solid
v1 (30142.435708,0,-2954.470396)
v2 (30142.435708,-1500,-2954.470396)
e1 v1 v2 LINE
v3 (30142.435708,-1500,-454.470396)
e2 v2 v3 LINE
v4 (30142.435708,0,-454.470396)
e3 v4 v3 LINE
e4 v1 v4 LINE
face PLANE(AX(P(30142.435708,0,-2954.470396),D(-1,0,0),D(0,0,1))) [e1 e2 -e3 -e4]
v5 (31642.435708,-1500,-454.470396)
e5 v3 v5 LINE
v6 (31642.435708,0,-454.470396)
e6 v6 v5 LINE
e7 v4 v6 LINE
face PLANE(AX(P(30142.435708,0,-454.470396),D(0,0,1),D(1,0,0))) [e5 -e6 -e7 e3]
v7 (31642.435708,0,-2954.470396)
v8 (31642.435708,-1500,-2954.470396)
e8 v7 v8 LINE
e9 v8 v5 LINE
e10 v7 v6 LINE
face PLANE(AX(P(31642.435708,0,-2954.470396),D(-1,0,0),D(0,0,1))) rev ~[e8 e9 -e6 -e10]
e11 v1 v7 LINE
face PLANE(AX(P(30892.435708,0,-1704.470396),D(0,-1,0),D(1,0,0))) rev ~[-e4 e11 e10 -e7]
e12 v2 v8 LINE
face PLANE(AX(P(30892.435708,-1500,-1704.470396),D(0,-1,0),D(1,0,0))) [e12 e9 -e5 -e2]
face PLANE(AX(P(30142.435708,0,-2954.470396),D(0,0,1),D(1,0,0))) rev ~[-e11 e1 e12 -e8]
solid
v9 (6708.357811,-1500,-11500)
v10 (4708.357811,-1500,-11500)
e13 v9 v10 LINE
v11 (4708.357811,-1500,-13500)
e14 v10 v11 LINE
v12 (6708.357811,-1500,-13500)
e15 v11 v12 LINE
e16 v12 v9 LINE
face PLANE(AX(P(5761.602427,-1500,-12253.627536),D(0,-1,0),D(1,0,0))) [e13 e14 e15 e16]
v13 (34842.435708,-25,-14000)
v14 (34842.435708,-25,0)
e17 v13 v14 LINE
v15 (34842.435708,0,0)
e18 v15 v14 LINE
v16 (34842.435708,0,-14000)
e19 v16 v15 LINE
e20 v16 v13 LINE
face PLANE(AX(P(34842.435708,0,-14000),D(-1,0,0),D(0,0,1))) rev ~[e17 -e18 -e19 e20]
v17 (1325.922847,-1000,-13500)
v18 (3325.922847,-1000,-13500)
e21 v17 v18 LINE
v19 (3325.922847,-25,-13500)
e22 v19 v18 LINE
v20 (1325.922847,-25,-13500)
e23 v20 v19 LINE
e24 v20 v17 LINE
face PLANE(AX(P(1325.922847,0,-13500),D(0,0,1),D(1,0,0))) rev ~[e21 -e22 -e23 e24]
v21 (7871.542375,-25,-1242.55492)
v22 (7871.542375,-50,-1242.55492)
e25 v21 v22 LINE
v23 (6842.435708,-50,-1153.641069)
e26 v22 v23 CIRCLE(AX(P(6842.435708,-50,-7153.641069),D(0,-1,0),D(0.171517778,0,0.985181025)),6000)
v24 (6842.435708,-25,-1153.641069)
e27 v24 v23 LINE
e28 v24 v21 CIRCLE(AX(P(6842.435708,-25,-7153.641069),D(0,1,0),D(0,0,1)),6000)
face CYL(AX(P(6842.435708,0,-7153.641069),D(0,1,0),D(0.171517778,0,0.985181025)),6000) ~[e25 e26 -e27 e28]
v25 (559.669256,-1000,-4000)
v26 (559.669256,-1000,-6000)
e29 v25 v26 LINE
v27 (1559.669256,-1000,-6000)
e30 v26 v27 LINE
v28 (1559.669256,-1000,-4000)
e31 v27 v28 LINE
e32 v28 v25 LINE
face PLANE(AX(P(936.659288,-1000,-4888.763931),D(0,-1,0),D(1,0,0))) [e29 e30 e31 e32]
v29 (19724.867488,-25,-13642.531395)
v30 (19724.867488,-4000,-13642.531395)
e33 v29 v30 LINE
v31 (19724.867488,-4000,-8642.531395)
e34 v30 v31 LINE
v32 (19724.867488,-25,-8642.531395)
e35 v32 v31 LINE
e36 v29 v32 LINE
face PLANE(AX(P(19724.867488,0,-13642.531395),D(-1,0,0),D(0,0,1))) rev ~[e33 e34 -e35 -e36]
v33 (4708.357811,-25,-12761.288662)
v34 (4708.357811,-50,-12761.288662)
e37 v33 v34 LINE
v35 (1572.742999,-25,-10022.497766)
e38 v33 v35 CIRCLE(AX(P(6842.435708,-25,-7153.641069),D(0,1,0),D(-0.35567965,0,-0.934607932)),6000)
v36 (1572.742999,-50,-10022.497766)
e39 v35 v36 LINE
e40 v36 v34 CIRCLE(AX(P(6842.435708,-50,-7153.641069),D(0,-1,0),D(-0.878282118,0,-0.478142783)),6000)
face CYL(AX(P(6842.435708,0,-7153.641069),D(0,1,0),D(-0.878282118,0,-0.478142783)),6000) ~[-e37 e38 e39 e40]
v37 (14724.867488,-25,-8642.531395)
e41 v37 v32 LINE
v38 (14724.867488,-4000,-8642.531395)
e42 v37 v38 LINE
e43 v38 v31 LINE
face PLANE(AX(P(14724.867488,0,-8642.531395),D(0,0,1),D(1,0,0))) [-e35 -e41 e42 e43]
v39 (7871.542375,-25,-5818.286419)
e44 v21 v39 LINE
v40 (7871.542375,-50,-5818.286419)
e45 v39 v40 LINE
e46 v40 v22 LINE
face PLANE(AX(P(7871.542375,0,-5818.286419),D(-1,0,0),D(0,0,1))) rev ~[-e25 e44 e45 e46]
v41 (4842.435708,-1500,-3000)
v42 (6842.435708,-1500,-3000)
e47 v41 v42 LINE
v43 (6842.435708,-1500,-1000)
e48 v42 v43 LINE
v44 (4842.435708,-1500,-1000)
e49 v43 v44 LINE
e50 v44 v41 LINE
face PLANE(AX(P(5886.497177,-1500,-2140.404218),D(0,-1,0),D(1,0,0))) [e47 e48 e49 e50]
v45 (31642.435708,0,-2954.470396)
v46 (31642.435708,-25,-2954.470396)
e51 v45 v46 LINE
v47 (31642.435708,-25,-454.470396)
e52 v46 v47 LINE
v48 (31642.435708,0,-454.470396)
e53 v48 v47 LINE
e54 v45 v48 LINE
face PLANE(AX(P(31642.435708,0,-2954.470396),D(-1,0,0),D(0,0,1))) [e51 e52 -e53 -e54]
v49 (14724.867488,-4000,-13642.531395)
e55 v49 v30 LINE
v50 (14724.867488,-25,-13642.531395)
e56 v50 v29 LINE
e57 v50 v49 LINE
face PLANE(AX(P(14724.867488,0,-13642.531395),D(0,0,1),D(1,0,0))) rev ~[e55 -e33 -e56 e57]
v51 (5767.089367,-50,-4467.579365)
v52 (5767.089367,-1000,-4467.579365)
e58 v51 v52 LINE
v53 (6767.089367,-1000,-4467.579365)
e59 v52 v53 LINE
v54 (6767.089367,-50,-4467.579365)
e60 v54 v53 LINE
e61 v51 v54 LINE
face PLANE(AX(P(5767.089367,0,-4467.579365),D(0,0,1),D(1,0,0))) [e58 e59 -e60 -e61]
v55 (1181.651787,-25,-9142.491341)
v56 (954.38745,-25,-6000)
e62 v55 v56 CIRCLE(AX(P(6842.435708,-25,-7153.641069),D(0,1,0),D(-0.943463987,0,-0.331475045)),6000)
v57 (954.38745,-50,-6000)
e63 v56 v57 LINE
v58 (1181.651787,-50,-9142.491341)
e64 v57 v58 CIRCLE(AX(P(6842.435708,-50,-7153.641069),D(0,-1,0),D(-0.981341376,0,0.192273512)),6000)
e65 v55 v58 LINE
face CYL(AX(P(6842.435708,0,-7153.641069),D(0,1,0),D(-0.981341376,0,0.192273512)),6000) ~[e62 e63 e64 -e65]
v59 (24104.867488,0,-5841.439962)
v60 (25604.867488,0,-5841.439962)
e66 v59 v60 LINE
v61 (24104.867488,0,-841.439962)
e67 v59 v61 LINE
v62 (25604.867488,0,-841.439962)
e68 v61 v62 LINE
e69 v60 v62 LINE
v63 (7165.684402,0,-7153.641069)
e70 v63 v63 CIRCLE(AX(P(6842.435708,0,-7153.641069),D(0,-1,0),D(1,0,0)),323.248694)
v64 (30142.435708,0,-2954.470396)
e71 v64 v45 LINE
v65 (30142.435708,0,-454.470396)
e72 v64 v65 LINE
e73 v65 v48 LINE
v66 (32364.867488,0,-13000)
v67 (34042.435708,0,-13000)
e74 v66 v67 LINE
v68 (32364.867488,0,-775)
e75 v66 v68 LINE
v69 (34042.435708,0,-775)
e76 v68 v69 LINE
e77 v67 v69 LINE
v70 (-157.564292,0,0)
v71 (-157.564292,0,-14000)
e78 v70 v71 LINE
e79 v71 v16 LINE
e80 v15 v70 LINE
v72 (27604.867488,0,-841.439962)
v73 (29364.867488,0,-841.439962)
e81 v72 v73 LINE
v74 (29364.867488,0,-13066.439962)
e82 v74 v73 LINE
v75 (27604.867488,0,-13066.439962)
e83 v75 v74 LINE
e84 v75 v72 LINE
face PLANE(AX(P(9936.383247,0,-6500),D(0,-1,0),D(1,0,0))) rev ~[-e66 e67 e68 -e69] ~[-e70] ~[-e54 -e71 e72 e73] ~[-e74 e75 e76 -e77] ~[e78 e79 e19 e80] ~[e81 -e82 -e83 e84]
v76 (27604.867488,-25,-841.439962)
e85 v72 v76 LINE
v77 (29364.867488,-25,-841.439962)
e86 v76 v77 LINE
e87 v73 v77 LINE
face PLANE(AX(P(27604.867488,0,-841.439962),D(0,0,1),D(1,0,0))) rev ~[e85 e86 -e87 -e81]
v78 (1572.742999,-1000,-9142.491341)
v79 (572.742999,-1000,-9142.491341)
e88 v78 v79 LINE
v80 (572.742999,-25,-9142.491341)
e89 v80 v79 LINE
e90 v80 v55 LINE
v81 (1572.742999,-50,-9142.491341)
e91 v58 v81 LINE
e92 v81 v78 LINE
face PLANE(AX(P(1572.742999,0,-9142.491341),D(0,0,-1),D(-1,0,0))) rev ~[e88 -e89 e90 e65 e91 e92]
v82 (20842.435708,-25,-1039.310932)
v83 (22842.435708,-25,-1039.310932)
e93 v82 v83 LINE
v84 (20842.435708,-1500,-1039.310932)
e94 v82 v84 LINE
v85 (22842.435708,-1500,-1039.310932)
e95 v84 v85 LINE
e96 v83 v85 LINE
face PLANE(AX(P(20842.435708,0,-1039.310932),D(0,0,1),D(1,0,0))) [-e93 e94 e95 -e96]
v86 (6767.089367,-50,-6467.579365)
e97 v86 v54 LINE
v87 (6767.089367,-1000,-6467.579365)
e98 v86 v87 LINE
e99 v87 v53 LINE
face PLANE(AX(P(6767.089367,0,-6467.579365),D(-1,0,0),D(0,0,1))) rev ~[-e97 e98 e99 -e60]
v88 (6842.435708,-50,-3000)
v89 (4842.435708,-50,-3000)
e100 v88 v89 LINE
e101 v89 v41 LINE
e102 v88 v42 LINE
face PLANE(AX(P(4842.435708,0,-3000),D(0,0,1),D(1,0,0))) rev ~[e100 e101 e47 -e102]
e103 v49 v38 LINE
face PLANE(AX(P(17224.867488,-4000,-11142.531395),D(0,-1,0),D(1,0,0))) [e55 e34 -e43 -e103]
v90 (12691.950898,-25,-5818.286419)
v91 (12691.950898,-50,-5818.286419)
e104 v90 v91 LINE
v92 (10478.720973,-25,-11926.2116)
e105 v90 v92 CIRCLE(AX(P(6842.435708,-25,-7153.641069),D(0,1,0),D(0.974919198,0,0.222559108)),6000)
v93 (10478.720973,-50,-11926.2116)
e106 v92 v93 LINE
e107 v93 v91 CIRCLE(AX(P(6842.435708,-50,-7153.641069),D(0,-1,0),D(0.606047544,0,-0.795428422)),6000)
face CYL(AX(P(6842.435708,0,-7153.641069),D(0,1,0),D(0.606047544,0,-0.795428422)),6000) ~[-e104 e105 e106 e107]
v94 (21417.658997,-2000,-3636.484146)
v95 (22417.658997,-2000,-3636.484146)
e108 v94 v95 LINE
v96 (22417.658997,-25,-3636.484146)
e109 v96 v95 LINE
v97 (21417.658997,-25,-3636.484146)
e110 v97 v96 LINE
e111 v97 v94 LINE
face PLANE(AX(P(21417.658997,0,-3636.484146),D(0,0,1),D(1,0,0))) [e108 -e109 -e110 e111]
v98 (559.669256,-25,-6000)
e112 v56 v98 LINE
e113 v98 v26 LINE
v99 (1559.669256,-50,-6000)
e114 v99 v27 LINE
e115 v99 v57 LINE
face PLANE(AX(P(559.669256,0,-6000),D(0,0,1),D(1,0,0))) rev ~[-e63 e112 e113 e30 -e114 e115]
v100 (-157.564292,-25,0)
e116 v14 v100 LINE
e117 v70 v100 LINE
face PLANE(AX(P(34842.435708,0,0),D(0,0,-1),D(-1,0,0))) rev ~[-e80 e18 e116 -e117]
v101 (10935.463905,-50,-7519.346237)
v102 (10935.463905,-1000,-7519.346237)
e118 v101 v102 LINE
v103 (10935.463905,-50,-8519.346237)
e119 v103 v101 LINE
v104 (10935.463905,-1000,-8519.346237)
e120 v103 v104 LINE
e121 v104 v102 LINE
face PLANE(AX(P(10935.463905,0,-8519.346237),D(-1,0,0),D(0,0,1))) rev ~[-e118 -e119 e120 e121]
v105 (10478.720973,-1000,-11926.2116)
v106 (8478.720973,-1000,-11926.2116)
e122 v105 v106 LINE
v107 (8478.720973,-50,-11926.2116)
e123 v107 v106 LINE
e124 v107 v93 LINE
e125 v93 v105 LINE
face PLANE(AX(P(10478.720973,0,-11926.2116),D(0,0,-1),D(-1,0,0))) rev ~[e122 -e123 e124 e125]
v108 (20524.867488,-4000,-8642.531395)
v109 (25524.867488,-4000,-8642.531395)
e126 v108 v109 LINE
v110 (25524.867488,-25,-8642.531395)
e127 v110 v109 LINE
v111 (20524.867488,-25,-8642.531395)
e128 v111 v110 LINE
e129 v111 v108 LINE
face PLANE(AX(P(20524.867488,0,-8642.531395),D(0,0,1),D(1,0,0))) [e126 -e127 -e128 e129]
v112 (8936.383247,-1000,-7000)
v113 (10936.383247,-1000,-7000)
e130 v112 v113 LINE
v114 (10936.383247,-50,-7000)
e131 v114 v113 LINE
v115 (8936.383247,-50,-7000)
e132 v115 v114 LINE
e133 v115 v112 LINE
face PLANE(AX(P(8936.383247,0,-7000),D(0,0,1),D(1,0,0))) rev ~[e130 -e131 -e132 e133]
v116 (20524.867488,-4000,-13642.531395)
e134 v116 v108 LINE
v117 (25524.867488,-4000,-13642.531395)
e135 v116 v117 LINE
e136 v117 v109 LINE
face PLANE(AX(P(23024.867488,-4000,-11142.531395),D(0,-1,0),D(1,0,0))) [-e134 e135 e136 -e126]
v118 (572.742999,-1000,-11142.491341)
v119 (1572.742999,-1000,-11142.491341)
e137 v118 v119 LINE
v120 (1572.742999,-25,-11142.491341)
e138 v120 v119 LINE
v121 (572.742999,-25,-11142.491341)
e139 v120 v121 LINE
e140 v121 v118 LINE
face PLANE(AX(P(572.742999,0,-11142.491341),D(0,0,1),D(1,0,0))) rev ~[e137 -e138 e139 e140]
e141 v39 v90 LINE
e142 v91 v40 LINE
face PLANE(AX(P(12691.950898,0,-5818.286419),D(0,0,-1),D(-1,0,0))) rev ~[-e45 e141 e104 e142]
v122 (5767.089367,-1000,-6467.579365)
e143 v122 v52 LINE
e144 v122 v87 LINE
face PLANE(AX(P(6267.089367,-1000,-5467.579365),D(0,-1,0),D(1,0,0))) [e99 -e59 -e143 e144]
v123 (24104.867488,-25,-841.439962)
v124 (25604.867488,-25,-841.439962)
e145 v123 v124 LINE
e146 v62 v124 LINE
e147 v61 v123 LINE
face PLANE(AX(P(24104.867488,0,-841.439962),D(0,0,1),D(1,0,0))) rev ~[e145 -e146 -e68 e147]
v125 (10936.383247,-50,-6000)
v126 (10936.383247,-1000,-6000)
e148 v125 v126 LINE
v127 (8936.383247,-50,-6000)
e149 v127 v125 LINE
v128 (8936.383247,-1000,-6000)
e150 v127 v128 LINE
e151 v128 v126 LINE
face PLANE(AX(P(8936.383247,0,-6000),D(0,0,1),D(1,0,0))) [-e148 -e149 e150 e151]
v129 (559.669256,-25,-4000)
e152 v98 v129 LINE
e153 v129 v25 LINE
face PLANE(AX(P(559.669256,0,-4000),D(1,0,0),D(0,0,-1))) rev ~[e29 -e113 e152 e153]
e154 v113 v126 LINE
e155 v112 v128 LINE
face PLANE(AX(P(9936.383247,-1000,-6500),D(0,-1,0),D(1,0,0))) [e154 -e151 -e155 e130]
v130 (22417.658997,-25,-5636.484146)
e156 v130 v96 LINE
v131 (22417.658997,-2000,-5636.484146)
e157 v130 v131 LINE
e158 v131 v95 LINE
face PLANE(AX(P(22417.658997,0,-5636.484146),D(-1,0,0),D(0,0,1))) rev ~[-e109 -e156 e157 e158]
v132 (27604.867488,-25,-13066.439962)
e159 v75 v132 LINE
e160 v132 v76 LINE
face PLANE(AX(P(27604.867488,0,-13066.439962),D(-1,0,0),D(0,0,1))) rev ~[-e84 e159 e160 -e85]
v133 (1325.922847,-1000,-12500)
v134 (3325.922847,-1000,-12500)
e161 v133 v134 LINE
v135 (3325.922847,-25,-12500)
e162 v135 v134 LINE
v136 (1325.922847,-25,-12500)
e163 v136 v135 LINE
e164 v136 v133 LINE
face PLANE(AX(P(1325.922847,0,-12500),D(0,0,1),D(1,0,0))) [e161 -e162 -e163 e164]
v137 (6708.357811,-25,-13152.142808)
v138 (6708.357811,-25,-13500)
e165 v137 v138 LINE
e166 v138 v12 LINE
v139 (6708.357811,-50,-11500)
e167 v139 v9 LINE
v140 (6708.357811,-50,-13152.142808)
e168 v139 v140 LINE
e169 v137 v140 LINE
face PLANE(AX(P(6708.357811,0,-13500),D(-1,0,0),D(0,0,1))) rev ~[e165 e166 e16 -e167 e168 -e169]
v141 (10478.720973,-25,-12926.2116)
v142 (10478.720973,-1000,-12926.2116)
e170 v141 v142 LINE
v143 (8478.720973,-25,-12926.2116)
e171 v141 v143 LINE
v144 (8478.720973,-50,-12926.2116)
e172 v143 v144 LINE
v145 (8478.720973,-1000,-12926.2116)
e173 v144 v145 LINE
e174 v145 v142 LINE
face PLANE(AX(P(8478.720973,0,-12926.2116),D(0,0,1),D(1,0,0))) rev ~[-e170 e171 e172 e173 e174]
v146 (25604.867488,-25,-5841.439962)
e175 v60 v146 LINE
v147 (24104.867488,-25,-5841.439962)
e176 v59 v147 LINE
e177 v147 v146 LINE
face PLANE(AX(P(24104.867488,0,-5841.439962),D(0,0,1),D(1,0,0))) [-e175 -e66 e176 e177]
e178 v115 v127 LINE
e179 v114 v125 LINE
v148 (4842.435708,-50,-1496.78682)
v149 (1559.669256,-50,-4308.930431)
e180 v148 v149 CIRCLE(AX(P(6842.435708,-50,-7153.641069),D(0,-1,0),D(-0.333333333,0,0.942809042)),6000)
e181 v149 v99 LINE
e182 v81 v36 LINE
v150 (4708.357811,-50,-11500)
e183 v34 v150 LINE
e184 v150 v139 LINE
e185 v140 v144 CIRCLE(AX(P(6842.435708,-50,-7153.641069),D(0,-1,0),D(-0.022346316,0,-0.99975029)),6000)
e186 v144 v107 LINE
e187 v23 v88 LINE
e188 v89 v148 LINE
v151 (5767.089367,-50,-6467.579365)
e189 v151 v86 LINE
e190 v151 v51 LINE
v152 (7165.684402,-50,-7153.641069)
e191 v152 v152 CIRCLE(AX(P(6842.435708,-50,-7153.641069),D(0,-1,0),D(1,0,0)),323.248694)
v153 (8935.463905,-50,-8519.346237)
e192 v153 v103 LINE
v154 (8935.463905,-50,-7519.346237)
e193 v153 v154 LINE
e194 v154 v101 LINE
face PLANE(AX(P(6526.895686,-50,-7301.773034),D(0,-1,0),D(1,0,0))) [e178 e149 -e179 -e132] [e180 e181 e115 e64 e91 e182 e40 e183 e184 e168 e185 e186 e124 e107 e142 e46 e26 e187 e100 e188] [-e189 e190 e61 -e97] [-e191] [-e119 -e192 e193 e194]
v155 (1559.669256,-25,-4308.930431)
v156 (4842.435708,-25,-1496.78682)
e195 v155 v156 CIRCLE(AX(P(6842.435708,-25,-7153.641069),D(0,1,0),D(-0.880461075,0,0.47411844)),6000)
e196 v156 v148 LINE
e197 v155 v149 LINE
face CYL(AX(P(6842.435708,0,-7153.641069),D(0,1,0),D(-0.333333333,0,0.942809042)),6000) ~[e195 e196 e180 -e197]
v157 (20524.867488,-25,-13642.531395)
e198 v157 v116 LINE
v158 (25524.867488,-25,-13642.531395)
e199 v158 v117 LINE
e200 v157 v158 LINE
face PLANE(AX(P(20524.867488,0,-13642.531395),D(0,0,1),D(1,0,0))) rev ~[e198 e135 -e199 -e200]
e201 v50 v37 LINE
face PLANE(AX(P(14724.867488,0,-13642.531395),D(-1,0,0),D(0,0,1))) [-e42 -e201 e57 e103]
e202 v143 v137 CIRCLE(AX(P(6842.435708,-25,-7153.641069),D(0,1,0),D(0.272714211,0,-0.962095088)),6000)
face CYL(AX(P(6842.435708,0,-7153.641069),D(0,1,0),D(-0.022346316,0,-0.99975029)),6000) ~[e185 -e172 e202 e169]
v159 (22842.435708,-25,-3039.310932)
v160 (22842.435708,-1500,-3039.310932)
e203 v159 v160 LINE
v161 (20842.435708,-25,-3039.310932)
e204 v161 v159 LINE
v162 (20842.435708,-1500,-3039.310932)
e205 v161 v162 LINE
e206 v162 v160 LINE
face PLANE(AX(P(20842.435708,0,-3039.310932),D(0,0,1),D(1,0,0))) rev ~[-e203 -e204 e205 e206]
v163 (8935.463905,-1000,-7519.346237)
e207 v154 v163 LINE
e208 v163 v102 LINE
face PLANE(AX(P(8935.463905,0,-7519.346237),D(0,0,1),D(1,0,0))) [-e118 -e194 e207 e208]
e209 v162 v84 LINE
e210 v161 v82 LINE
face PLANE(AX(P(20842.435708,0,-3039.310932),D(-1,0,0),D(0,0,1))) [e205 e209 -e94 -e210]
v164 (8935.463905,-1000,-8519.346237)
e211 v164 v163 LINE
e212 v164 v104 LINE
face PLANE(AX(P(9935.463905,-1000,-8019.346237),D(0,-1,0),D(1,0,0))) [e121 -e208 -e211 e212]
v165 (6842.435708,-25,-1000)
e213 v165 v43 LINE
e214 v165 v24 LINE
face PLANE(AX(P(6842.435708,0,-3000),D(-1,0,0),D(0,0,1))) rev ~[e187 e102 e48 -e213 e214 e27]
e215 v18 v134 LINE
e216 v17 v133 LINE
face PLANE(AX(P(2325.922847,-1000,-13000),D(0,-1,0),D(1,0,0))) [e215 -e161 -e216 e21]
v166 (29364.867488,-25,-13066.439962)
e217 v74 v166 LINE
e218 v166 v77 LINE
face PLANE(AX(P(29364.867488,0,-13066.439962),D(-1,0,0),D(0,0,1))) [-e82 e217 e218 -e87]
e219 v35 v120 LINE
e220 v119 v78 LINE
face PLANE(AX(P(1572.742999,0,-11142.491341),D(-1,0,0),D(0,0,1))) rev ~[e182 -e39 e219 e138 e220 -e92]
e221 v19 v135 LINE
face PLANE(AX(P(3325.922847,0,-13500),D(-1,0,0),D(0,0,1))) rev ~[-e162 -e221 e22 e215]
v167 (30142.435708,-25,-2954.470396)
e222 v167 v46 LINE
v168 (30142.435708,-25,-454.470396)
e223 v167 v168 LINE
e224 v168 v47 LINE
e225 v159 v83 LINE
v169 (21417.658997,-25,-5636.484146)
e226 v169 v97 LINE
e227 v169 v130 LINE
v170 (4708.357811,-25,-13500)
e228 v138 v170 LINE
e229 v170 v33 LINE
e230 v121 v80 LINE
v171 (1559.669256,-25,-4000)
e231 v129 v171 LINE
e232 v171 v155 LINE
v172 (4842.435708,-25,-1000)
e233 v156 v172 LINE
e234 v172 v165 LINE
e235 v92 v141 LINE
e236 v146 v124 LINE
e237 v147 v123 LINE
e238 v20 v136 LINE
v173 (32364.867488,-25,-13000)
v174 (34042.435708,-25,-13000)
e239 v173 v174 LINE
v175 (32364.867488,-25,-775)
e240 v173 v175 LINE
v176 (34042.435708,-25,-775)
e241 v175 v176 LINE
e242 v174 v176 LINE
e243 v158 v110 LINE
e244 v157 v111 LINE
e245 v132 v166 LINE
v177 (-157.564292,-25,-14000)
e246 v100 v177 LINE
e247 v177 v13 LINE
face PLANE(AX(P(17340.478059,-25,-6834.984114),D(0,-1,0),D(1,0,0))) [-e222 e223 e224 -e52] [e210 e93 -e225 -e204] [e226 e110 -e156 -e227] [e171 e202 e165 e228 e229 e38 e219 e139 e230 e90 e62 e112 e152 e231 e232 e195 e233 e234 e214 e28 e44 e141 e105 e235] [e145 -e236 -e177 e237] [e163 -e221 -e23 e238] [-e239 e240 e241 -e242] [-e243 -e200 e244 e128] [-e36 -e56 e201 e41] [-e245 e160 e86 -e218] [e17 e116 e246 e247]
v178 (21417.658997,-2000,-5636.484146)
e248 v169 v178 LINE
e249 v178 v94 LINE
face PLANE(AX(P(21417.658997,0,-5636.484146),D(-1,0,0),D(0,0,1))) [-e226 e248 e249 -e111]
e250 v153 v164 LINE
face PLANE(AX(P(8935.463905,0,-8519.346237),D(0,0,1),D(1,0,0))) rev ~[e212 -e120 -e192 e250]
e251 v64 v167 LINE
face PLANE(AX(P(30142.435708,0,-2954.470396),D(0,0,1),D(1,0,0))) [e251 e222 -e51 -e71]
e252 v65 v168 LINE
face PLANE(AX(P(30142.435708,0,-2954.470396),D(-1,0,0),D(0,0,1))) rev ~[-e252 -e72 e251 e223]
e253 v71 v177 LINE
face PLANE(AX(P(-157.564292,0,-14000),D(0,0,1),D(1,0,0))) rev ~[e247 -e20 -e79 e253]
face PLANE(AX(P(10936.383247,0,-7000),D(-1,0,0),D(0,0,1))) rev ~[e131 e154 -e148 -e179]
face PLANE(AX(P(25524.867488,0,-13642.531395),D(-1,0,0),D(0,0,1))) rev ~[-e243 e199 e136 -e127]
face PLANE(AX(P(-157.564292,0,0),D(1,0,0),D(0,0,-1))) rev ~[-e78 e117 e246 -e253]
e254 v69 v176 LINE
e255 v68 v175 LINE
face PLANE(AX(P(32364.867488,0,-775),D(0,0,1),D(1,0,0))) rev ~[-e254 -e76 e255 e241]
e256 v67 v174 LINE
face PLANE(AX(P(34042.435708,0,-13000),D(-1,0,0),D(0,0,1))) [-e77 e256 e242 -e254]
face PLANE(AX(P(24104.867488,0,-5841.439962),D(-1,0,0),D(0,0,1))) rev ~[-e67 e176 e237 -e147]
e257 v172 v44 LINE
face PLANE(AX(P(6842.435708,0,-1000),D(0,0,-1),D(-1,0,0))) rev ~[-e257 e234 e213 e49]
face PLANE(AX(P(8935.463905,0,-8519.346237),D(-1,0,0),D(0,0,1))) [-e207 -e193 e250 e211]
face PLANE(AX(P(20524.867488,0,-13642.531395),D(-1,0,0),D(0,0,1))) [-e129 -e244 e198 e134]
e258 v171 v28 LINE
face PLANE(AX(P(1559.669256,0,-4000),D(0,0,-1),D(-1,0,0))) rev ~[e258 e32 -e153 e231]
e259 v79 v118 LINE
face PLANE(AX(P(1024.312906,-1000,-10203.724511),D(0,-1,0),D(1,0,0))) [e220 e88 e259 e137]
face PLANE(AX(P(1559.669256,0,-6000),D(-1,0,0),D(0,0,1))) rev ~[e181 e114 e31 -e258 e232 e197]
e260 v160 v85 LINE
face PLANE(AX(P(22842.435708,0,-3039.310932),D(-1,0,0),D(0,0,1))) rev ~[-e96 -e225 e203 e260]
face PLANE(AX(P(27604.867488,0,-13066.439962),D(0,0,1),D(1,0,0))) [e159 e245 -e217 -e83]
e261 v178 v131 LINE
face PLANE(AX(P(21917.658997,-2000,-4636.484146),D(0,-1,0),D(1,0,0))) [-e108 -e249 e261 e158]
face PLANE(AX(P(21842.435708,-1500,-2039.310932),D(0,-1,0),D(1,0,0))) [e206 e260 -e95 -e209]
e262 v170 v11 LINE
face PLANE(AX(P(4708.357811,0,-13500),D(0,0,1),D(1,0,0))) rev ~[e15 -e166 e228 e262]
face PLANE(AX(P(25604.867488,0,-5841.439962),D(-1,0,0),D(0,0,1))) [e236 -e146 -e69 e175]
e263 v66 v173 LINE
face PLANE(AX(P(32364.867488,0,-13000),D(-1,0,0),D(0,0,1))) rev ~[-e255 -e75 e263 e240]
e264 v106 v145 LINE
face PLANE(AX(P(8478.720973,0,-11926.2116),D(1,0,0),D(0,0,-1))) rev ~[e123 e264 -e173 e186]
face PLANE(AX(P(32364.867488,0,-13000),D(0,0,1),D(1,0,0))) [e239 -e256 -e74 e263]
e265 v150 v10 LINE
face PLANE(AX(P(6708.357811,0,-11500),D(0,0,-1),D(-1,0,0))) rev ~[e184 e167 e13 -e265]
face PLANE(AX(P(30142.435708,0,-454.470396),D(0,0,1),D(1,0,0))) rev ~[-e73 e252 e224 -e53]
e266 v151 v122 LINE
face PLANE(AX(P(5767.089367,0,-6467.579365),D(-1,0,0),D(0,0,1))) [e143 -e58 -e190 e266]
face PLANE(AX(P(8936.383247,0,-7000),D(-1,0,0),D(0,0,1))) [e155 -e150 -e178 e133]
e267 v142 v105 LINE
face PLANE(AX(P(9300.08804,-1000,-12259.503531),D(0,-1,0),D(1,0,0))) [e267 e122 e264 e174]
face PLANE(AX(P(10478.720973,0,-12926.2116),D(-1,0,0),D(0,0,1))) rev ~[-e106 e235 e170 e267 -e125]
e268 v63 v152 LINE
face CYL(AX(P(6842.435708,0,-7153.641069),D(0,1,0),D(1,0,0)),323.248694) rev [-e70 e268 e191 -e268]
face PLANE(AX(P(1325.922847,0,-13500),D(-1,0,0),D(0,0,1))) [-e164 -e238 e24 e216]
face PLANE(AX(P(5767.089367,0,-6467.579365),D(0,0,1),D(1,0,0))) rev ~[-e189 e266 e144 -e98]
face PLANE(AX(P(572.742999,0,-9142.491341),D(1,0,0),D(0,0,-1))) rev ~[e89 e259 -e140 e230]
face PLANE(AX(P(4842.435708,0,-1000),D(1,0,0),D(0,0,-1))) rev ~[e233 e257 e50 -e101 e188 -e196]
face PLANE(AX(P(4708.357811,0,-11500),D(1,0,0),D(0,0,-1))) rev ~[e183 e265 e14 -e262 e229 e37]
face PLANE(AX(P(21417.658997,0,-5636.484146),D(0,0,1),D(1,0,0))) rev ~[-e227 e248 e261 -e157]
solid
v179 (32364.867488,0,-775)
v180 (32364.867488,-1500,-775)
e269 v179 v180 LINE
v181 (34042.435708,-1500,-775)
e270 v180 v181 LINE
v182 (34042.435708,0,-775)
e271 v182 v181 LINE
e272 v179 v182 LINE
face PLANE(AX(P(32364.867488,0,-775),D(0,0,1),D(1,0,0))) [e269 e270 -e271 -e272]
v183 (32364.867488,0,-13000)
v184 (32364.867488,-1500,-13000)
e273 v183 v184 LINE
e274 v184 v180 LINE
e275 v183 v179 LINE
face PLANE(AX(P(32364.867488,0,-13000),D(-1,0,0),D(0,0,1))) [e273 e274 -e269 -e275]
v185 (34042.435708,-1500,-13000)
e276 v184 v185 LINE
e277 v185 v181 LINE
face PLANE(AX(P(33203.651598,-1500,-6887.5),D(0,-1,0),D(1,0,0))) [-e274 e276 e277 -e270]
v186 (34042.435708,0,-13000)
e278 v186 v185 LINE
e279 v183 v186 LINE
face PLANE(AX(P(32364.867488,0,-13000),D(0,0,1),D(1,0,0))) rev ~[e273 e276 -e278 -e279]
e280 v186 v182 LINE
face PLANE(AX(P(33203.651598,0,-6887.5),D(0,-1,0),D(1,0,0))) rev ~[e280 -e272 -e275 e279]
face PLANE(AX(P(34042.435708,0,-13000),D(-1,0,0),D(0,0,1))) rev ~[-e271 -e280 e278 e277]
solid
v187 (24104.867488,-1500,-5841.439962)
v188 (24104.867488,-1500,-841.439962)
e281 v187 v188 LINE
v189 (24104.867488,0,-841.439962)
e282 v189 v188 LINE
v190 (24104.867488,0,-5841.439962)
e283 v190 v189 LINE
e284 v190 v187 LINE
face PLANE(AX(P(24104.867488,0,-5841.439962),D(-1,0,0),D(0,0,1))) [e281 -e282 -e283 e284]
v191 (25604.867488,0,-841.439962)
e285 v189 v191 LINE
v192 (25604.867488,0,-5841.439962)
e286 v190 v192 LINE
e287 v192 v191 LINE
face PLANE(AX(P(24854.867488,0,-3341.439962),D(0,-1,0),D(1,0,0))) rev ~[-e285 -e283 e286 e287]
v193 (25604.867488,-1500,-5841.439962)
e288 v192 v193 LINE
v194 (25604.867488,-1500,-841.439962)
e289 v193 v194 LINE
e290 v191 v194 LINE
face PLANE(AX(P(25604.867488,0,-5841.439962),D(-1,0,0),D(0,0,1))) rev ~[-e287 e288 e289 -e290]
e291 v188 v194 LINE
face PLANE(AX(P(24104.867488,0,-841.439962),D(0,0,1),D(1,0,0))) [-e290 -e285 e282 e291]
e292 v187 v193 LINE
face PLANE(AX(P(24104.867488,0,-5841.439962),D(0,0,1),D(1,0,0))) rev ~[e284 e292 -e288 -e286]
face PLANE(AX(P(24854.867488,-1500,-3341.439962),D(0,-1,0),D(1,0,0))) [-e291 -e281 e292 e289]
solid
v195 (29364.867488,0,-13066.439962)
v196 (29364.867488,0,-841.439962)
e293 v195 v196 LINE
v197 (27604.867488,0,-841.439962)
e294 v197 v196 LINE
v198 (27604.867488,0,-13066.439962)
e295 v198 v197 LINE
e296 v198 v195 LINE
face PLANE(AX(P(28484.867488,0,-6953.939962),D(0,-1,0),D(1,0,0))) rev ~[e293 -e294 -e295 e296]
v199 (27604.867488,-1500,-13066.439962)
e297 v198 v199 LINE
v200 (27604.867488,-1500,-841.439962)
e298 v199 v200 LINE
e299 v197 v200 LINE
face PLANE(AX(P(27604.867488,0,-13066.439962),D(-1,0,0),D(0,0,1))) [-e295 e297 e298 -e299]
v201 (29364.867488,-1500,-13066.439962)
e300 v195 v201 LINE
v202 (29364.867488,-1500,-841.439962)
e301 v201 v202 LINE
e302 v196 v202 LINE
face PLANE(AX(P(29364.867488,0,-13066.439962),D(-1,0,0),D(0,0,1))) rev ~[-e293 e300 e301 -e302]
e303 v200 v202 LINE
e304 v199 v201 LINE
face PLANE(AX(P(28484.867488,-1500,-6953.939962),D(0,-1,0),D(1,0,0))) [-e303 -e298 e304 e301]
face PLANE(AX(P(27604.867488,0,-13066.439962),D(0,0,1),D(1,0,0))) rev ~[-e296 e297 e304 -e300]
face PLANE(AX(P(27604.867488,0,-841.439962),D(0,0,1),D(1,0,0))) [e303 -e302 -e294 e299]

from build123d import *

# Parameters (mm, degrees)
F0_W     = 1677.5682196007
F0_H     = 12225
F1_DEPTH = 1500
F0_W_2   = 1760
F0_W_3   = 1500
F0_H_2   = 5000
F0_H_3   = 2500
F0_W_4   = 2000
F0_H_4   = 1000
F0_W_5   = 5000
F0_W_6   = 1000
F0_H_5   = 2000
F0_W_7   = 4531.0974121094
F0_H_6   = 6739.2702102661
F2_DEPTH = 25
F3_DEPTH = 4000
F4_DEPTH = 1500
F0_R     = 323.2486939486
F5_DEPTH = 50
F6_DEPTH = 2000
F7_DEPTH = 25
F8_DEPTH = 1000


# Not quite as in the source:
# - a feature names something its author has since deleted; it is built from what else it names


with BuildPart() as f1:
    # F0 (on Front) → F1 (new body)
    with BuildSketch(Plane.XZ):
        with Locations((33203.6515982442, -6887.5)):
            Rectangle(F0_W, F0_H)
    extrude(amount=F1_DEPTH)


with BuildPart() as f1b:
    # F0 (on Front) → F1, piece 2 (new body)
    with BuildSketch(Plane.XZ):
        with Locations((28484.8674884439, -6953.9399623871)):
            Rectangle(F0_W_2, F0_H)
    extrude(amount=F1_DEPTH)


with BuildPart() as f1c:
    # F0 (on Front) → F1, piece 3 (new body)
    with BuildSketch(Plane.XZ):
        with Locations((24854.8674884439, -3341.4399623871)):
            Rectangle(F0_W_3, F0_H_2)
    extrude(amount=F1_DEPTH)


with BuildPart() as f1d:
    # F0 (on Front) → F1, piece 4 (new body)
    with BuildSketch(Plane.XZ):
        with Locations((30892.4357080446, -1704.4703960419)):
            Rectangle(F0_W_3, F0_H_3)
    extrude(amount=F1_DEPTH)


with BuildPart() as f2:
    # F0 (on Front) → F2 (new body)
    with BuildSketch(Plane.XZ):
        Polygon((15060.6956481934, 0), (-157.5642919554, 0), (-157.5642919554, -14000), (34842.4357080446, -14000), (34842.4357080446, 0), (19591.7930603027, 0), (19591.7930603027, -6739.2702102661), (15060.6956481934, -6739.2702102661), align=None)
        with Locations((2325.9228467941, -13000)):
            Rectangle(F0_W_4, F0_H_4, mode=Mode.SUBTRACT)
        with Locations((17224.8674884439, -11142.5313949585)):
            Rectangle(F0_W_5, F0_H_2, mode=Mode.SUBTRACT)
        with BuildLine():
            Line((10478.7209733374, -12926.2115996243), (8478.7209733374, -12926.2115996243))
            ThreePointArc((8478.7209733374, -12926.2115996243), (7601.9868729202, -13105.3703999085), (6708.3578109742, -13152.142808433))
            Line((6708.3578109741, -13152.142808433), (6708.3578109741, -13500))
            Line((6708.3578109741, -13500), (4708.3578109741, -13500))
            Line((4708.3578109741, -13500), (4708.3578109741, -12761.2886622132))
            ThreePointArc((4708.3578109742, -12761.2886622131), (2895.3863427984, -11672.5791421162), (1572.7429986001, -10022.497766057))
            Line((1572.7429986, -10022.4977660571), (1572.7429986, -11142.4913406372))
            Line((1572.7429986, -11142.4913406372), (572.7429986, -11142.4913406372))
            Line((572.7429986, -11142.4913406372), (572.7429986, -9142.4913406372))
            Line((572.7429986, -9142.4913406372), (1181.6517873175, -9142.4913406372))
            ThreePointArc((1181.6517873175, -9142.4913406372), (858.0648867062, -7586.4295539984), (954.3874504445, -5999.9999999999))
            Line((954.3874504445, -6000), (559.6692562103, -6000))
            Line((559.6692562103, -6000), (559.6692562103, -4000))
            Line((559.6692562103, -4000), (1559.6692562103, -4000))
            Line((1559.6692562103, -4000), (1559.6692562103, -4308.9304307886))
            ThreePointArc((1559.6692562102, -4308.9304307885), (2939.0128869101, -2596.9657152915), (4842.4357080447, -1496.7868195462))
            Line((4842.4357080446, -1496.7868195462), (4842.4357080446, -1000))
            Line((4842.4357080446, -1000), (6842.4357080446, -1000))
            Line((6842.4357080446, -1000), (6842.4357080446, -1153.6410690386))
            ThreePointArc((6842.4357080447, -1153.6410690386), (7358.9059893254, -1175.9108602927), (7871.5423754885, -1242.5549195207))
            Line((7871.5423754883, -1242.5549195207), (7871.5423754883, -546.0254189148))
            Line((7871.5423754883, -546.0254189148), (13195.7473754883, -546.0254189148))
            Line((13195.7473754883, -546.0254189148), (13195.7473754883, -5818.2864189148))
            Line((13195.7473754883, -5818.2864189148), (12691.9508980747, -5818.2864189148))
            ThreePointArc((12691.9508980747, -5818.2864189149), (12804.695813918, -6481.7374822721), (12842.4357080446, -7153.6410690386))
            ThreePointArc((12842.4357080446, -7153.6410690386), (12219.1313285794, -9816.5613089485), (10478.7209733374, -11926.2115996243))
            Line((10478.7209733374, -11926.2115996243), (10478.7209733374, -12926.2115996243))
        make_face(mode=Mode.SUBTRACT)
        with Locations((23024.8674884439, -11142.5313949585)):
            Rectangle(F0_W_5, F0_H_2, mode=Mode.SUBTRACT)
        with Locations((21917.658996582, -4636.4841461182)):
            Rectangle(F0_W_6, F0_H_5, mode=Mode.SUBTRACT)
        with Locations((28484.8674884439, -6953.9399623871)):
            Rectangle(F0_W_2, F0_H, mode=Mode.SUBTRACT)
        with Locations((33203.6515982442, -6887.5)):
            Rectangle(F0_W, F0_H, mode=Mode.SUBTRACT)
        with Locations((24854.8674884439, -3341.4399623871)):
            Rectangle(F0_W_3, F0_H_2, mode=Mode.SUBTRACT)
        with Locations((21842.4357080446, -2039.3109321594)):
            Rectangle(F0_W_4, F0_H_5, mode=Mode.SUBTRACT)
        with Locations((30892.4357080446, -1704.4703960419)):
            Rectangle(F0_W_3, F0_H_3, mode=Mode.SUBTRACT)
        with Locations((17326.244354248, -3369.6351051331)):
            Rectangle(F0_W_7, F0_H_6)
        with BuildLine():
            Line((7871.5423754883, -5818.2864189148), (12691.9508980747, -5818.2864189148))
            ThreePointArc((12691.9508980747, -5818.2864189149), (10973.1970607696, -2801.9964779865), (7871.5423754885, -1242.5549195207))
            Line((7871.5423754883, -1242.5549195207), (7871.5423754883, -5818.2864189148))
        make_face()
        with BuildLine():
            ThreePointArc((7871.5423754885, -1242.5549195207), (10973.1970607696, -2801.9964779865), (12691.9508980747, -5818.2864189149))
            Line((12691.9508980747, -5818.2864189148), (13195.7473754883, -5818.2864189148))
            Line((13195.7473754883, -5818.2864189148), (13195.7473754883, -546.0254189148))
            Line((13195.7473754883, -546.0254189148), (7871.5423754883, -546.0254189148))
            Line((7871.5423754883, -546.0254189148), (7871.5423754883, -1242.5549195207))
        make_face()
    extrude(amount=F2_DEPTH)

    # F0 (on Front) → F3 (join)
    with BuildSketch(Plane.XZ):
        with Locations((17224.8674884439, -11142.5313949585)):
            Rectangle(F0_W_5, F0_H_2)
        with Locations((23024.8674884439, -11142.5313949585)):
            Rectangle(F0_W_5, F0_H_2)
    extrude(amount=F3_DEPTH)

    # F0 (on Front) → F4 (join)
    with BuildSketch(Plane.XZ):
        with BuildLine():
            Line((6842.4357080446, -3000), (6842.4357080446, -1153.6410690386))
            ThreePointArc((6842.4357080447, -1153.6410690386), (5827.8238356901, -1240.0497111177), (4842.4357080447, -1496.7868195462))
            Line((4842.4357080446, -1496.7868195462), (4842.4357080446, -3000))
            Line((4842.4357080446, -3000), (6842.4357080446, -3000))
        make_face()
        with BuildLine():
            ThreePointArc((4842.4357080447, -1496.7868195462), (5827.8238356901, -1240.0497111177), (6842.4357080447, -1153.6410690386))
            Line((6842.4357080446, -1153.6410690386), (6842.4357080446, -1000))
            Line((6842.4357080446, -1000), (4842.4357080446, -1000))
            Line((4842.4357080446, -1000), (4842.4357080446, -1496.7868195462))
        make_face()
        with BuildLine():
            ThreePointArc((4708.3578109742, -12761.2886622131), (5691.6427564117, -13042.2466410287), (6708.3578109742, -13152.142808433))
            Line((6708.3578109741, -13152.142808433), (6708.3578109741, -11500))
            Line((6708.3578109741, -11500), (4708.3578109741, -11500))
            Line((4708.3578109741, -11500), (4708.3578109741, -12761.2886622132))
        make_face()
        with BuildLine():
            Line((6708.3578109741, -13500), (6708.3578109741, -13152.142808433))
            ThreePointArc((6708.3578109742, -13152.142808433), (5691.6427564117, -13042.2466410287), (4708.3578109742, -12761.2886622131))
            Line((4708.3578109741, -12761.2886622132), (4708.3578109741, -13500))
            Line((4708.3578109741, -13500), (6708.3578109741, -13500))
        make_face()
        with Locations((21842.4357080446, -2039.3109321594)):
            Rectangle(F0_W_4, F0_H_5)
    extrude(amount=F4_DEPTH)

    # F0 (on Front) → F5 (join)
    with BuildSketch(Plane.XZ):
        with BuildLine():
            ThreePointArc((6708.3578109742, -13152.142808433), (7601.9868729202, -13105.3703999085), (8478.7209733374, -12926.2115996243))
            Line((8478.7209733374, -12926.2115996243), (8478.7209733374, -11926.2115996243))
            Line((8478.7209733374, -11926.2115996243), (10478.7209733374, -11926.2115996243))
            ThreePointArc((10478.7209733374, -11926.2115996243), (12219.1313285794, -9816.5613089485), (12842.4357080446, -7153.6410690386))
            ThreePointArc((12842.4357080446, -7153.6410690386), (12804.695813918, -6481.7374822721), (12691.9508980747, -5818.2864189149))
            Line((12691.9508980747, -5818.2864189148), (7871.5423754883, -5818.2864189148))
            Line((7871.5423754883, -5818.2864189148), (7871.5423754883, -1242.5549195207))
            ThreePointArc((7871.5423754885, -1242.5549195207), (7358.9059893254, -1175.9108602927), (6842.4357080447, -1153.6410690386))
            Line((6842.4357080446, -1153.6410690386), (6842.4357080446, -3000))
            Line((6842.4357080446, -3000), (4842.4357080446, -3000))
            Line((4842.4357080446, -3000), (4842.4357080446, -1496.7868195462))
            ThreePointArc((4842.4357080447, -1496.7868195462), (2939.0128869101, -2596.9657152915), (1559.6692562102, -4308.9304307885))
            Line((1559.6692562103, -4308.9304307886), (1559.6692562103, -6000))
            Line((1559.6692562103, -6000), (954.3874504445, -6000))
            ThreePointArc((954.3874504445, -5999.9999999999), (858.0648867062, -7586.4295539984), (1181.6517873175, -9142.4913406372))
            Line((1181.6517873175, -9142.4913406372), (1572.7429986, -9142.4913406372))
            Line((1572.7429986, -9142.4913406372), (1572.7429986, -10022.4977660571))
            ThreePointArc((1572.7429986001, -10022.497766057), (2895.3863427984, -11672.5791421162), (4708.3578109742, -12761.2886622131))
            Line((4708.3578109741, -12761.2886622132), (4708.3578109741, -11500))
            Line((4708.3578109741, -11500), (6708.3578109741, -11500))
            Line((6708.3578109741, -11500), (6708.3578109741, -13152.142808433))
        make_face()
        with Locations((6842.4357080446, -7153.6410690386)):
            Circle(F0_R, mode=Mode.SUBTRACT)
        with Locations((9935.4639053345, -8019.3462371826)):
            Rectangle(F0_W_4, F0_H_4, mode=Mode.SUBTRACT)
        with Locations((6267.0893669128, -5467.5793647766)):
            Rectangle(F0_W_6, F0_H_5, mode=Mode.SUBTRACT)
        with Locations((9936.3832473755, -6500)):
            Rectangle(F0_W_4, F0_H_4, mode=Mode.SUBTRACT)
    extrude(amount=F5_DEPTH)

    # F0 (on Front) → F6 (join)
    with BuildSketch(Plane.XZ):
        with Locations((21917.658996582, -4636.4841461182)):
            Rectangle(F0_W_6, F0_H_5)
    extrude(amount=F6_DEPTH)

    # F0 (on Front) → F7 (join)
    with BuildSketch(Plane.XZ):
        with Locations((9936.3832473755, -6500)):
            Rectangle(F0_W_4, F0_H_4)
    extrude(amount=F7_DEPTH)

    # F0 (on Front) → F8 (join)
    with BuildSketch(Plane.XZ):
        with Locations((6267.0893669128, -5467.5793647766)):
            Rectangle(F0_W_6, F0_H_5)
        with BuildLine():
            Line((559.6692562103, -6000), (954.3874504445, -6000))
            ThreePointArc((954.3874504445, -5999.9999999999), (1193.3911525372, -5131.6876546661), (1559.6692562102, -4308.9304307885))
            Line((1559.6692562103, -4308.9304307886), (1559.6692562103, -4000))
            Line((1559.6692562103, -4000), (559.6692562103, -4000))
            Line((559.6692562103, -4000), (559.6692562103, -6000))
        make_face()
        with BuildLine():
            ThreePointArc((1559.6692562102, -4308.9304307885), (1193.3911525372, -5131.6876546661), (954.3874504445, -5999.9999999999))
            Line((954.3874504445, -6000), (1559.6692562103, -6000))
            Line((1559.6692562103, -6000), (1559.6692562103, -4308.9304307886))
        make_face()
        with BuildLine():
            Line((1572.7429986, -11142.4913406372), (1572.7429986, -10022.4977660571))
            ThreePointArc((1572.7429986001, -10022.497766057), (1359.5137983438, -9590.3534714618), (1181.6517873175, -9142.4913406372))
            Line((1181.6517873175, -9142.4913406372), (572.7429986, -9142.4913406372))
            Line((572.7429986, -9142.4913406372), (572.7429986, -11142.4913406372))
            Line((572.7429986, -11142.4913406372), (1572.7429986, -11142.4913406372))
        make_face()
        with BuildLine():
            ThreePointArc((1181.6517873175, -9142.4913406372), (1359.5137983438, -9590.3534714618), (1572.7429986001, -10022.497766057))
            Line((1572.7429986, -10022.4977660571), (1572.7429986, -9142.4913406372))
            Line((1572.7429986, -9142.4913406372), (1181.6517873175, -9142.4913406372))
        make_face()
        with Locations((2325.9228467941, -13000)):
            Rectangle(F0_W_4, F0_H_4)
        with BuildLine():
            Line((8478.7209733374, -11926.2115996243), (8478.7209733374, -12926.2115996243))
            ThreePointArc((8478.7209733374, -12926.2115996243), (9525.7172810443, -12520.2042150381), (10478.7209733374, -11926.2115996243))
            Line((10478.7209733374, -11926.2115996243), (8478.7209733374, -11926.2115996243))
        make_face()
        with BuildLine():
            ThreePointArc((10478.7209733374, -11926.2115996243), (9525.7172810443, -12520.2042150381), (8478.7209733374, -12926.2115996243))
            Line((8478.7209733374, -12926.2115996243), (10478.7209733374, -12926.2115996243))
            Line((10478.7209733374, -12926.2115996243), (10478.7209733374, -11926.2115996243))
        make_face()
        with Locations((9935.4639053345, -8019.3462371826)):
            Rectangle(F0_W_4, F0_H_4)
        with Locations((9936.3832473755, -6500)):
            Rectangle(F0_W_4, F0_H_4)
    extrude(amount=F8_DEPTH)


solid = Compound([f1.part, f1b.part, f1c.part, f1d.part, f2.part])
